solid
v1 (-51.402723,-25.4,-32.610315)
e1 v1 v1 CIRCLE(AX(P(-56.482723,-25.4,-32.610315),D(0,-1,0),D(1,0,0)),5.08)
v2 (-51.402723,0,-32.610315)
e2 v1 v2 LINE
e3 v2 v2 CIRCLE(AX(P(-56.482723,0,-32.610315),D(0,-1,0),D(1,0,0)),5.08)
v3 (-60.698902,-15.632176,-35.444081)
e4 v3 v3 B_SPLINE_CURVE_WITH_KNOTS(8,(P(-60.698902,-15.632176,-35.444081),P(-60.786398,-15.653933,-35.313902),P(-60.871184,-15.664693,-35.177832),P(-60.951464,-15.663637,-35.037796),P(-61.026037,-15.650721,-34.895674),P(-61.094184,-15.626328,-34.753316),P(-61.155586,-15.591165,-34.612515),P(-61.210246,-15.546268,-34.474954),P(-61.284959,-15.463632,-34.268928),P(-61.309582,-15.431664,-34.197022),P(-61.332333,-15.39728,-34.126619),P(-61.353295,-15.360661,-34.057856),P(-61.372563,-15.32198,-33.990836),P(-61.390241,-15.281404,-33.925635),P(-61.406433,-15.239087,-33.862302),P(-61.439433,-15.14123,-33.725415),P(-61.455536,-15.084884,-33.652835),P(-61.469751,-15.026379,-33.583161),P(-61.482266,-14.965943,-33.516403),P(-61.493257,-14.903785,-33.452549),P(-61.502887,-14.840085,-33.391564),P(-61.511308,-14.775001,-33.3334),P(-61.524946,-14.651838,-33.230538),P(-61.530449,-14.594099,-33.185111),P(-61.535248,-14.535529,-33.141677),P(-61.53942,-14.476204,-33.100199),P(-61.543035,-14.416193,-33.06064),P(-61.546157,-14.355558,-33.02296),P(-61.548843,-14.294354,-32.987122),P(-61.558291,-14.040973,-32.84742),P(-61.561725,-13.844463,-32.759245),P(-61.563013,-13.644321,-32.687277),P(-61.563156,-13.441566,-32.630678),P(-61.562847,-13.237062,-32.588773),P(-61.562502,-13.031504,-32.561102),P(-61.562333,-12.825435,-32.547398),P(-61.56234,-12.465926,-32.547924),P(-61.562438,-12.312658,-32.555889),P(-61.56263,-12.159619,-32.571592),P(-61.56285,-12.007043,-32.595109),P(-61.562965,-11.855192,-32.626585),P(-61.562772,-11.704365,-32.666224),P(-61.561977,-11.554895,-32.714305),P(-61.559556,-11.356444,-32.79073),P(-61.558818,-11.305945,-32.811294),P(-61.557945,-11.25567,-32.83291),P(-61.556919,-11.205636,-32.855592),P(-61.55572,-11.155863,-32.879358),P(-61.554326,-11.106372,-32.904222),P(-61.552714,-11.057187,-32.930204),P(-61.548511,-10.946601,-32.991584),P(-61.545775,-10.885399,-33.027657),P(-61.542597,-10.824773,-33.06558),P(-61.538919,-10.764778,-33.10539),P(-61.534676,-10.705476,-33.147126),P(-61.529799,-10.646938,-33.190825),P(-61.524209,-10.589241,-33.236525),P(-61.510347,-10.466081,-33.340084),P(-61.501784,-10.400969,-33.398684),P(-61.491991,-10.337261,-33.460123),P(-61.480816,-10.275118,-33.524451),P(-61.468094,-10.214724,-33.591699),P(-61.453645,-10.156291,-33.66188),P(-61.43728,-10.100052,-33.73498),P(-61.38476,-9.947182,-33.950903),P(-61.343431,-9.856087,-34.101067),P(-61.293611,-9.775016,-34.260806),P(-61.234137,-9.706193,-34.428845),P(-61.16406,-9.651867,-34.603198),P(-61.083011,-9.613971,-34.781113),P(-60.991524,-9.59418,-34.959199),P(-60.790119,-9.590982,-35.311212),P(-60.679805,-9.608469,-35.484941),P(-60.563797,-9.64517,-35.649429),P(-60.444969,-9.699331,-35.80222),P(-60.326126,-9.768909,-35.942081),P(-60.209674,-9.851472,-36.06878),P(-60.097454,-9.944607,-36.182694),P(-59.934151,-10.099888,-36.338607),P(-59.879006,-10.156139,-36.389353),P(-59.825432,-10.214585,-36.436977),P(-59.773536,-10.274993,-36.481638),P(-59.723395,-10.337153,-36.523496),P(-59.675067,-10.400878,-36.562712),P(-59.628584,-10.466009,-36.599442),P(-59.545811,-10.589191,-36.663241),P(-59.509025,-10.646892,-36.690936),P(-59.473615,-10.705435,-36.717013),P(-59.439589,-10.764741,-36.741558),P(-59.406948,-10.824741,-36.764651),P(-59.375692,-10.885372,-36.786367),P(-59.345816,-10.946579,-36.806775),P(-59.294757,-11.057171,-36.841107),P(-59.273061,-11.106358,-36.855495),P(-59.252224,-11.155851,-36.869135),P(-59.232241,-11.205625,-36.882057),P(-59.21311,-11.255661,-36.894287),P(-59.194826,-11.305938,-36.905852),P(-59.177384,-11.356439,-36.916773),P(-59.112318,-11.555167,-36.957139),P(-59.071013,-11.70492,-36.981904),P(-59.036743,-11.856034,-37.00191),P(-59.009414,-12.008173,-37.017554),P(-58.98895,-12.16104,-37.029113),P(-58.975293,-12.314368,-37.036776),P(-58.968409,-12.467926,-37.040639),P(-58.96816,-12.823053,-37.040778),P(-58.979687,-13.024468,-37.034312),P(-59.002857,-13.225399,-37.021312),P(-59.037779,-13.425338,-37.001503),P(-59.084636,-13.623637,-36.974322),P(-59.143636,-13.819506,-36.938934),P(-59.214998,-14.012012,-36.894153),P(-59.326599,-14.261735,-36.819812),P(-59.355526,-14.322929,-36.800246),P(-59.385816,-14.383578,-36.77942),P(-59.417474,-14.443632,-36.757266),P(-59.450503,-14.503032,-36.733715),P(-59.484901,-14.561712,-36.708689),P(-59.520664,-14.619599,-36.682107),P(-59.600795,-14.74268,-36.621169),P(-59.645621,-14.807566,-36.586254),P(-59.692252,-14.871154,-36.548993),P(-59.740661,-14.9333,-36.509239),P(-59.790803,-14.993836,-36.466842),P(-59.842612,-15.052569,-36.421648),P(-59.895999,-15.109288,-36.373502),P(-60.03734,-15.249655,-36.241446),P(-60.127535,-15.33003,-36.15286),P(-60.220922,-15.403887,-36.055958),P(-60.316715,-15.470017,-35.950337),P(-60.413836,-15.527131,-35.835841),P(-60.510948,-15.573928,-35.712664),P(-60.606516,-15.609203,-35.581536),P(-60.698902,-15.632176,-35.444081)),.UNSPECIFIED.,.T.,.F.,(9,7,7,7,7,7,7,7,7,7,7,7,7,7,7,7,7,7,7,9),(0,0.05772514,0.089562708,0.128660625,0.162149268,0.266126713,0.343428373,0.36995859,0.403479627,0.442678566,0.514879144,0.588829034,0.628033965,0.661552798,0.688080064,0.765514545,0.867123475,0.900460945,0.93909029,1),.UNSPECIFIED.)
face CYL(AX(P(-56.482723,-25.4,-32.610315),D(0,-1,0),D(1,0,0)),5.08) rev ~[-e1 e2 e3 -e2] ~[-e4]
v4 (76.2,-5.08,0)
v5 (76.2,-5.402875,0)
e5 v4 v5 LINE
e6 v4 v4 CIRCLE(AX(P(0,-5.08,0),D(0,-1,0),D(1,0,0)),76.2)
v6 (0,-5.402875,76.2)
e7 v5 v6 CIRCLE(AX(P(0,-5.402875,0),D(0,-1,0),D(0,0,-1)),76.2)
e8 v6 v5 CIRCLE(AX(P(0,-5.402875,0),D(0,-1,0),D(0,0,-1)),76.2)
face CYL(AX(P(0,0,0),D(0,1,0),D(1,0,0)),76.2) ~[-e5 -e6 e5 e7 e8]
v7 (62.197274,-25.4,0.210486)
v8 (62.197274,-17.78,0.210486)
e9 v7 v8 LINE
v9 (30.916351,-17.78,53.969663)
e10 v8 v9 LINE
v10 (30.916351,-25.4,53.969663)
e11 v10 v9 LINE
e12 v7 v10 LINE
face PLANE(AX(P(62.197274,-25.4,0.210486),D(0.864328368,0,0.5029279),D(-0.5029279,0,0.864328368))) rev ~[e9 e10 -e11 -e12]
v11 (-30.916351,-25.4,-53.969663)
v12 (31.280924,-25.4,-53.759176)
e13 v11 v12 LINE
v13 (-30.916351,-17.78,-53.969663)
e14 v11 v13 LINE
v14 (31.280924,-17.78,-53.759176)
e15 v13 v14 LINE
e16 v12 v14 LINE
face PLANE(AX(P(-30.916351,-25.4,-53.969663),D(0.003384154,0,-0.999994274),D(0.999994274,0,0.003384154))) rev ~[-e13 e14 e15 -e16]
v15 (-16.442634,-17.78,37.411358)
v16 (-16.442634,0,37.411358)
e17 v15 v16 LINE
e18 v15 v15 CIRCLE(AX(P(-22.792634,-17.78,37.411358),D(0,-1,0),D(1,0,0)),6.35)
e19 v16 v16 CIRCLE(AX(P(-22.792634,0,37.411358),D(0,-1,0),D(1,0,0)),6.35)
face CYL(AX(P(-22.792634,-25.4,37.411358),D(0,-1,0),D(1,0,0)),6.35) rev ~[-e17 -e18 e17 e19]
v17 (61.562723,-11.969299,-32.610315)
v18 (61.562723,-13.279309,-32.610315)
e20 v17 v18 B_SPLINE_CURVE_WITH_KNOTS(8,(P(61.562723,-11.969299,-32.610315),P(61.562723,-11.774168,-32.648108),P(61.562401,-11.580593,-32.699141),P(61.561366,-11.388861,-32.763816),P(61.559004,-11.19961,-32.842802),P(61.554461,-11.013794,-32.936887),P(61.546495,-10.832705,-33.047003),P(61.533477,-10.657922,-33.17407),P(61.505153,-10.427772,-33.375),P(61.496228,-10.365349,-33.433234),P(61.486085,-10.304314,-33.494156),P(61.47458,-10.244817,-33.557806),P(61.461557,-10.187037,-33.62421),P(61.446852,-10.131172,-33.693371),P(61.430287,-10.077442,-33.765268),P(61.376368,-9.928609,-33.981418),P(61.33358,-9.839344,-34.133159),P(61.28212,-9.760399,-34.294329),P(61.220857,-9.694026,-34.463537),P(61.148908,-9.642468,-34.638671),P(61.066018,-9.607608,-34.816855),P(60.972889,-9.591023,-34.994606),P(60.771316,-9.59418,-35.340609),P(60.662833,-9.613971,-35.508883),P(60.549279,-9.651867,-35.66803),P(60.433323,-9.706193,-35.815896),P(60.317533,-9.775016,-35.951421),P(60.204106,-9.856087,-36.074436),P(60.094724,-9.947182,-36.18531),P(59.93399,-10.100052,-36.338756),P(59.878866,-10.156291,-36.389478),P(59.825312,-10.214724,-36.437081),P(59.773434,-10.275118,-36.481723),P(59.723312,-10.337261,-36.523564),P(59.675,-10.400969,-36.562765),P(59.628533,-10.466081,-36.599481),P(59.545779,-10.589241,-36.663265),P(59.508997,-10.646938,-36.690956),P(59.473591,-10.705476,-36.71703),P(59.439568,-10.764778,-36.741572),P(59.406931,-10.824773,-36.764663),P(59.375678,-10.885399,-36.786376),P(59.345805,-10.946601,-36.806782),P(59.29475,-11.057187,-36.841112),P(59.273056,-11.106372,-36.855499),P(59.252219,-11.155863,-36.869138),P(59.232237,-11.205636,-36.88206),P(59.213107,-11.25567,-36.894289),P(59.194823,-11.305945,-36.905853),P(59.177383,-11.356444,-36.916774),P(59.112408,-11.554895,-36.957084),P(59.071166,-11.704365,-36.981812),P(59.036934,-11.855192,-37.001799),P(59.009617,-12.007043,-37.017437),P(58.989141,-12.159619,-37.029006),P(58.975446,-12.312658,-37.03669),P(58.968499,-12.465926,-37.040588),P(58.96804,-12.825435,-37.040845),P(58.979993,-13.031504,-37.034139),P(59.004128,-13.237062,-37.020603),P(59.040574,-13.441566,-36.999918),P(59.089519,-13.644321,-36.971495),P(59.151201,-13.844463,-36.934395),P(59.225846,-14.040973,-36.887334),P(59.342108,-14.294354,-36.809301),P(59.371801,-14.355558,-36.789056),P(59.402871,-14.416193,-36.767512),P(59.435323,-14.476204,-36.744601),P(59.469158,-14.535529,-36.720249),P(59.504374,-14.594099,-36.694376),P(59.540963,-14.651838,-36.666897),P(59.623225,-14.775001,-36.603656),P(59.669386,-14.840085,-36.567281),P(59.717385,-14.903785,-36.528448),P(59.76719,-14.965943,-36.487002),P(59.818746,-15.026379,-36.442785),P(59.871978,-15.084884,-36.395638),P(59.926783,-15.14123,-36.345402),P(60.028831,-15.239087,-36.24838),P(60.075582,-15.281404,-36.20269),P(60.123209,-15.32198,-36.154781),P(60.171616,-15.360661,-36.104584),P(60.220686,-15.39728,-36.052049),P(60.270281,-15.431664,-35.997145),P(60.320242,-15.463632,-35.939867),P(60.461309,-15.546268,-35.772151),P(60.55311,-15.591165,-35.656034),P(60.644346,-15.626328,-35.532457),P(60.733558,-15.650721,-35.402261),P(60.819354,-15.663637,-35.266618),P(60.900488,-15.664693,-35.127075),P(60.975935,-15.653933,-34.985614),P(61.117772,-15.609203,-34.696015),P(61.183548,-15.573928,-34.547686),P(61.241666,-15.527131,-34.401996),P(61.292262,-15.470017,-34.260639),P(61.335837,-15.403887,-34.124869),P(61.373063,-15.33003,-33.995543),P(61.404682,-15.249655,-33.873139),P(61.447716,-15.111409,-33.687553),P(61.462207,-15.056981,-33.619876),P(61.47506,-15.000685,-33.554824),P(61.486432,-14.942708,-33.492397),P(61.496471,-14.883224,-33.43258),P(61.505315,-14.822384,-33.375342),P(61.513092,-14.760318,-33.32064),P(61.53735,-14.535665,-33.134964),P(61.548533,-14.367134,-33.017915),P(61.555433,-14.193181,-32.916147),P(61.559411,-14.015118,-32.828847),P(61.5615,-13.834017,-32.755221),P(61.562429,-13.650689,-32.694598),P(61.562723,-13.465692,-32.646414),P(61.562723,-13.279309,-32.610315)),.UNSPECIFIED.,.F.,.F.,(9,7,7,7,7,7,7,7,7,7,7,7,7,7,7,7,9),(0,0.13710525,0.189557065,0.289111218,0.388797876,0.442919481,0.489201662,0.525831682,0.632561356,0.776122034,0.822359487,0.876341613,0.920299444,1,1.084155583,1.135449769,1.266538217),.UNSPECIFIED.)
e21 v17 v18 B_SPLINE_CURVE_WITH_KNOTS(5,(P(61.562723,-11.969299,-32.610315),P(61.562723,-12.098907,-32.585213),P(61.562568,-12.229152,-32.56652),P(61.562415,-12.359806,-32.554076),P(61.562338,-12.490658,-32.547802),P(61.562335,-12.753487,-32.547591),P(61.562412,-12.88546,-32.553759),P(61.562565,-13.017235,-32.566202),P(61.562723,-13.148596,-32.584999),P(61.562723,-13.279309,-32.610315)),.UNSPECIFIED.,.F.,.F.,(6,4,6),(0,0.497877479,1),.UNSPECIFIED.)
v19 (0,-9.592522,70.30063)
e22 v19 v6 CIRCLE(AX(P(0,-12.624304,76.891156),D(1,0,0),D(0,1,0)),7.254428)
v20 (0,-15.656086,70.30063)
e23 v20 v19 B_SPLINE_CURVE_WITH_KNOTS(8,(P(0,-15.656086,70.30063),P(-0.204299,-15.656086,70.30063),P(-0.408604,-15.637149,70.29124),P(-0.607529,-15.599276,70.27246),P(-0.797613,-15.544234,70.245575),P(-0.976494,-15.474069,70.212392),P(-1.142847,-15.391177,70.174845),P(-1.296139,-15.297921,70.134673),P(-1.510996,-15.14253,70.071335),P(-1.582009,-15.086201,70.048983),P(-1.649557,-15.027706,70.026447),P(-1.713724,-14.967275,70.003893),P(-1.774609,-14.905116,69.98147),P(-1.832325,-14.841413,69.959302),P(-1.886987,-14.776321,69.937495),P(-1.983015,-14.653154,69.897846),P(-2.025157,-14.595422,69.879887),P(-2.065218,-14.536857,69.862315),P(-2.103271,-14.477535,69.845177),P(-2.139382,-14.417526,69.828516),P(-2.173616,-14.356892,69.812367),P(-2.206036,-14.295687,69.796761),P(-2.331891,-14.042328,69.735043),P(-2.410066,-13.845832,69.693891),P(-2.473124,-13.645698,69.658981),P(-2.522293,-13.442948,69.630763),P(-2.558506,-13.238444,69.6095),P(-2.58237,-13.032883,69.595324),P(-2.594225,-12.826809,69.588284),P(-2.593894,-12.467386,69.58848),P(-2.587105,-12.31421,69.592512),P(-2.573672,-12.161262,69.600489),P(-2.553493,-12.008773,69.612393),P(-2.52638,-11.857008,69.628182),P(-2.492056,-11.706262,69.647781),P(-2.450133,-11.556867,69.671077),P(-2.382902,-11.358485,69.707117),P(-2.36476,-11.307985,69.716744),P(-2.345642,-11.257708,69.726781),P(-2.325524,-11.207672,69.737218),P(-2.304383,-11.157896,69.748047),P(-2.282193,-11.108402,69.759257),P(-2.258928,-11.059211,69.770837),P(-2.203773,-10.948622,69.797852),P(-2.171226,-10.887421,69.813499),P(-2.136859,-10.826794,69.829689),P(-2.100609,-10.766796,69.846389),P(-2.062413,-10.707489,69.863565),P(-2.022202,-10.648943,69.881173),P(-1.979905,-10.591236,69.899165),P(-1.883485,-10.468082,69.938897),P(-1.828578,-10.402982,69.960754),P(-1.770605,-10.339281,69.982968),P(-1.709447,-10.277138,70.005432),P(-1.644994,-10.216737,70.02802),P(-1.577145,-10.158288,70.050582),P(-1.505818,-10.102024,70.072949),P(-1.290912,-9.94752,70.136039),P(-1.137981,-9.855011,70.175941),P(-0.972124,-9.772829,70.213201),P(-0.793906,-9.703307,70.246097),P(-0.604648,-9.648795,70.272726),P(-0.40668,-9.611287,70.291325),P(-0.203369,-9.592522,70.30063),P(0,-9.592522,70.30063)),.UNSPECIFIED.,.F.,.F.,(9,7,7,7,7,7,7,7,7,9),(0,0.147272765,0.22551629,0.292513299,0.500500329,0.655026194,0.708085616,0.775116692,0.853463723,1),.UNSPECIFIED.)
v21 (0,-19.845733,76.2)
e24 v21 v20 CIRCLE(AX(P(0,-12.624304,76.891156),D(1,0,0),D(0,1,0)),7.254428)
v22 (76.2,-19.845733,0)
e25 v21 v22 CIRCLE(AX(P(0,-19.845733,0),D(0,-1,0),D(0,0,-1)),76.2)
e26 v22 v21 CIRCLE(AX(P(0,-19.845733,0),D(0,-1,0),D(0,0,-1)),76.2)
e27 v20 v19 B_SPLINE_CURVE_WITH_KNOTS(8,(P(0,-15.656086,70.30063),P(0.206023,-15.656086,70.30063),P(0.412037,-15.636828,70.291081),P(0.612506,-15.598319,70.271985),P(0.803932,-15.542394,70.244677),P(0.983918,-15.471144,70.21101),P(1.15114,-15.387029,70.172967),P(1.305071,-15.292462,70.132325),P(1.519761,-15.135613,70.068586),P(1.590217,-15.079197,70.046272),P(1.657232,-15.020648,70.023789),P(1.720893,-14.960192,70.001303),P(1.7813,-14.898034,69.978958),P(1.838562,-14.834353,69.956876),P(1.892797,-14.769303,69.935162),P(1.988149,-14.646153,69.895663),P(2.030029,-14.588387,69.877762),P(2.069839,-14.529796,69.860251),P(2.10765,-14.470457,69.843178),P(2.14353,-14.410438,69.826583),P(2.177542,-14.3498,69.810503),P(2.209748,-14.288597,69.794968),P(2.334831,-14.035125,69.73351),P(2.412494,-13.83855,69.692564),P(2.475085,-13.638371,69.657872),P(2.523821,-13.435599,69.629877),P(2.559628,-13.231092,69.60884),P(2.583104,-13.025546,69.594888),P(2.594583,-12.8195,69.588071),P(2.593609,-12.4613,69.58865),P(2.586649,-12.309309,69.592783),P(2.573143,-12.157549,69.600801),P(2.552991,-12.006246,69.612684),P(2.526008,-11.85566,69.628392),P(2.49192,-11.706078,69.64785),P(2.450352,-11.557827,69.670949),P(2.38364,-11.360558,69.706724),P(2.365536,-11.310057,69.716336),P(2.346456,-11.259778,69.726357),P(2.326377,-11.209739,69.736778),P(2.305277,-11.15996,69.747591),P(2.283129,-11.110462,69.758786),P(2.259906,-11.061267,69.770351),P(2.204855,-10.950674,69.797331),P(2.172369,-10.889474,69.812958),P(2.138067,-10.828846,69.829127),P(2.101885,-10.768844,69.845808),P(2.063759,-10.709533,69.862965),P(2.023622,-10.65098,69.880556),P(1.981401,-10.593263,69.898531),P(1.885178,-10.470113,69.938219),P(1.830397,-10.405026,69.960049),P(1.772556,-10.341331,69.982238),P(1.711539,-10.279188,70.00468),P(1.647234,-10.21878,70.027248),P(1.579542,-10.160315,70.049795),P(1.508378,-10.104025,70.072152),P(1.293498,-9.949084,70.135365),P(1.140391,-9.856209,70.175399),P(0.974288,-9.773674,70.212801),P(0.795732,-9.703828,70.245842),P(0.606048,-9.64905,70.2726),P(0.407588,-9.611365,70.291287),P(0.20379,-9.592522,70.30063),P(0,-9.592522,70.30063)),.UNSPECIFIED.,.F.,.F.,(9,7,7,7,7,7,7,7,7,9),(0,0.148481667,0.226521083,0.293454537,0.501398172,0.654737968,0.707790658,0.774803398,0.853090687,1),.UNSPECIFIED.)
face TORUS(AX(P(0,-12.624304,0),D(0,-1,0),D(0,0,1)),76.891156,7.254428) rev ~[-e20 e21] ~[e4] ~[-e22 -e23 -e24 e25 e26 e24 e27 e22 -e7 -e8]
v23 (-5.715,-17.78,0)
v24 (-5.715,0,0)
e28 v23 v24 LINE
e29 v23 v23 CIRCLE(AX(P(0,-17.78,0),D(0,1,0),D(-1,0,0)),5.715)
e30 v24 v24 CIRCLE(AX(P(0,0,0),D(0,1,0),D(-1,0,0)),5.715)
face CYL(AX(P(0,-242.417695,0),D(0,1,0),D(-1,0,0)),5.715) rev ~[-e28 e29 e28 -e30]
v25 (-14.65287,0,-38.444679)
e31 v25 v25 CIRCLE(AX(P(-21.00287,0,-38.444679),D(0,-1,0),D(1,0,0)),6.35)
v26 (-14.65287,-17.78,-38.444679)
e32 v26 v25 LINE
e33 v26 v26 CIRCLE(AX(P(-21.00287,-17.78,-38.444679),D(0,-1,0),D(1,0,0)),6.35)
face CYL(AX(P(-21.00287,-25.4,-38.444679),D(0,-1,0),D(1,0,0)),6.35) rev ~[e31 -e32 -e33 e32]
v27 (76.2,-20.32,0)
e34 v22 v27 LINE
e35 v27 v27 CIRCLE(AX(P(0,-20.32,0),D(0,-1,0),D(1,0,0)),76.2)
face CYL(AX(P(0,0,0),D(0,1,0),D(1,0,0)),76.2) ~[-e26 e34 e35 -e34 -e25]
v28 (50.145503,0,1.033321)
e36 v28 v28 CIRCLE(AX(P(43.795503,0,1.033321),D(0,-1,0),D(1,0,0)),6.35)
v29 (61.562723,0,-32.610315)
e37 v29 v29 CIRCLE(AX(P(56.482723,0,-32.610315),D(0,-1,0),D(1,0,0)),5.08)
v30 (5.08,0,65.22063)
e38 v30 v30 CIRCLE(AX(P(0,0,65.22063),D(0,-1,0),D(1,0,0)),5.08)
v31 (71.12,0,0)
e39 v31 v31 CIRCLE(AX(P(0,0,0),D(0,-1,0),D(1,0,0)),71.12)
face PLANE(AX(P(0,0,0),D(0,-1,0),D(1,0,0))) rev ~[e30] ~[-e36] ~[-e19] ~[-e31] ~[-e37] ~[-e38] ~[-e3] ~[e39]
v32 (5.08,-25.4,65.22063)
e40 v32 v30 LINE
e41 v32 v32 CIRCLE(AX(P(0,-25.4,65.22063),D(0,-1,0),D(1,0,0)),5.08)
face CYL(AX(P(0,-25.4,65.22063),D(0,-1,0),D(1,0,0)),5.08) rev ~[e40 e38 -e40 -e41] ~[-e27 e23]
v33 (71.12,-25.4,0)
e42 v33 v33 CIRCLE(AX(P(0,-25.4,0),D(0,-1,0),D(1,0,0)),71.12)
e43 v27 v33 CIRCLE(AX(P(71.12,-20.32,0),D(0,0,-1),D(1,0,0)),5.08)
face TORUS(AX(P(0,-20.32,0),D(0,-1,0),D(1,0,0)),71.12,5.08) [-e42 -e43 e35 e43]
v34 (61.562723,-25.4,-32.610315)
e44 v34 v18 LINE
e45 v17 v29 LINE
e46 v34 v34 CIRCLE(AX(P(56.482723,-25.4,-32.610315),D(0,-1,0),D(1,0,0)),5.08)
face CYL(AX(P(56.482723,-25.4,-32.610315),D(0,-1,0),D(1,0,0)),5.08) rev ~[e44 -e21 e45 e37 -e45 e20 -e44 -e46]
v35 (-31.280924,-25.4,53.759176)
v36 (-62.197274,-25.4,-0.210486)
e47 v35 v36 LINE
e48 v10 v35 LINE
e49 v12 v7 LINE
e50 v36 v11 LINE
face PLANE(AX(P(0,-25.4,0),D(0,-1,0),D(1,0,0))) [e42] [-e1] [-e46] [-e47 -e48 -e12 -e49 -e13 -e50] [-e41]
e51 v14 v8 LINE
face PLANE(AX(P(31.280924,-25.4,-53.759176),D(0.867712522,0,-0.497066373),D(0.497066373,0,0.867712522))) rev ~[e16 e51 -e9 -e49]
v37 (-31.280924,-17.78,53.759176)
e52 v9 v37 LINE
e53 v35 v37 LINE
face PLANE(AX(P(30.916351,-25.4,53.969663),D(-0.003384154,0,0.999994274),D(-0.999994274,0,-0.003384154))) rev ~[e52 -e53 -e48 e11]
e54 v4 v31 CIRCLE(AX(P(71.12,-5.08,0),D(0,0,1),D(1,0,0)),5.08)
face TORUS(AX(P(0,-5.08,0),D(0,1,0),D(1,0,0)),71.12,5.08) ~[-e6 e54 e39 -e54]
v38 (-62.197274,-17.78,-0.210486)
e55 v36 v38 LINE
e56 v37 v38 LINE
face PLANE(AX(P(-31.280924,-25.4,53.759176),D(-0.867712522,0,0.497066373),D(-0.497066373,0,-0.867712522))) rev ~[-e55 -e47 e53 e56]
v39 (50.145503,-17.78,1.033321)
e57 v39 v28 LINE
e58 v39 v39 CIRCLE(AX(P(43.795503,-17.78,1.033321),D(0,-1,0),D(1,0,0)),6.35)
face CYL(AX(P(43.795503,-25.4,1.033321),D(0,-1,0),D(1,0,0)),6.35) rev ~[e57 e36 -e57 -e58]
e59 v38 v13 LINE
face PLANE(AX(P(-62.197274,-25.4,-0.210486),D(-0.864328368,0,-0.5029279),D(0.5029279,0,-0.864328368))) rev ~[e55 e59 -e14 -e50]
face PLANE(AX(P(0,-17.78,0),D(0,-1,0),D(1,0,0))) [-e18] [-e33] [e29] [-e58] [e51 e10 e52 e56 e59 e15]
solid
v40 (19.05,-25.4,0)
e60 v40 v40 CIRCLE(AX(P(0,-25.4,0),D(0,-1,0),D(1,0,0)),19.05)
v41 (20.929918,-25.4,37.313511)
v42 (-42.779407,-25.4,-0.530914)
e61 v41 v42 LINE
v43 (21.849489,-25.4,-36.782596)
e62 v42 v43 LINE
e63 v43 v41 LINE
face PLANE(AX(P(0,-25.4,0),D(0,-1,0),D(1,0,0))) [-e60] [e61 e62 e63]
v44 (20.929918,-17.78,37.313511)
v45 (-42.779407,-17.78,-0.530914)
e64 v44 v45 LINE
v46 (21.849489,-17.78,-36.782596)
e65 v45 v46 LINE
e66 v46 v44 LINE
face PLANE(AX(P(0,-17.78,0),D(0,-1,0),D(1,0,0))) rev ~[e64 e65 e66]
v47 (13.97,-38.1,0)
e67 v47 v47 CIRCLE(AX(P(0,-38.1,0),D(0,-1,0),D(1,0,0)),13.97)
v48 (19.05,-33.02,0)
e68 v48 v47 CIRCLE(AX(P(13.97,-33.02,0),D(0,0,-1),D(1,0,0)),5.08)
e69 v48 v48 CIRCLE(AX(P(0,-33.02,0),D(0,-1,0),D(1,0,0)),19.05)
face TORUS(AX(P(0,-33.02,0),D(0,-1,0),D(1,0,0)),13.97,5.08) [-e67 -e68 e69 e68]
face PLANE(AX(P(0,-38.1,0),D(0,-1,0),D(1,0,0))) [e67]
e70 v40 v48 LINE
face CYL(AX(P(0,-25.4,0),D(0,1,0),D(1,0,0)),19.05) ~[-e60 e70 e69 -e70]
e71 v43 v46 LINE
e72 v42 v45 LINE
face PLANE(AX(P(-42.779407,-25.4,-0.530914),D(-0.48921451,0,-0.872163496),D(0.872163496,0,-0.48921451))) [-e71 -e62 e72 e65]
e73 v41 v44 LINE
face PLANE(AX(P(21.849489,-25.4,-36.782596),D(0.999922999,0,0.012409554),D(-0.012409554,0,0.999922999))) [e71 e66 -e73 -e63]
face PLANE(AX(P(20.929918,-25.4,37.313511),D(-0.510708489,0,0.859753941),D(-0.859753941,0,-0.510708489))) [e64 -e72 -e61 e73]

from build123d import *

# Parameters (mm, degrees)
F0_R      = 76.2
F1_DEPTH  = 25.4
F5_D      = 11.43
F6_R      = 19.05
F7_DEPTH  = 12.7
F8_R      = 5.08
F9_R      = 7.2544282258
F11_R     = 5.08
F13_DEPTH = 7.62
F15_DEPTH = 7.62
F16_R     = 6.35
F17_DEPTH = 25.4
F18_R     = 5.08
F19_DEPTH = 25.4


with BuildPart() as f1:
    # F0 (on Front) → F1 (new body)
    with BuildSketch(Plane.XZ):
        Circle(F0_R)
    extrude(amount=F1_DEPTH)

    # F5 (through all)
    with Locations(Plane.XZ.offset(25.4)):
        with Locations((0, 0)):
            Hole(F5_D / 2)

    # F8
    f8_edges = [f1.edges().sort_by_distance(p)[0] for p in [
        (76.2, -12.7, 0),
        (-76.2, 0, 0),
        (-76.2, -25.4, 0),
    ]]
    fillet(f8_edges, radius=F8_R)

    # F9 (on Right) → F10 (revolve, cut)
    with BuildSketch(Plane.YZ):
        with Locations((-12.624304023, 76.8911556739)):
            Circle(F9_R)
    revolve(axis=Axis((0, -25.4, 0), (0, -1, 0)), mode=Mode.SUBTRACT)

    # F12 (on face) → F13 (cut)
    with BuildSketch(Plane.XZ.offset(25.4)):
        Polygon((-30.9163505312, -53.9696626636), (31.2809236348, -53.7591762841), (62.1972741659, 0.2104863795), (30.9163505312, 53.9696626636), (-31.2809236348, 53.7591762841), (-62.1972741659, -0.2104863795), align=None)
    extrude(amount=-F13_DEPTH, mode=Mode.SUBTRACT)

    # F16 (on face) → F17 (cut)
    with BuildSketch(Plane.XZ.offset(25.4)):
        with Locations((-22.7926336229, 37.4113582075)):
            Circle(F16_R)
        with Locations((-21.0028697863, -38.4446788403)):
            Circle(F16_R)
        with Locations((43.7955034092, 1.0333206328)):
            Circle(F16_R)
    extrude(amount=-F17_DEPTH, mode=Mode.SUBTRACT)

    # F18 (on face) → F19 (cut)
    with BuildSketch(Plane.XZ.offset(25.4)):
        with Locations((0, 65.2206302532)):
            Circle(F18_R)
        with Locations((-56.4827226501, -32.6103151266)):
            Circle(F18_R)
        with Locations((56.4827226501, -32.6103151266)):
            Circle(F18_R)
    extrude(amount=-F19_DEPTH, mode=Mode.SUBTRACT)


with BuildPart() as f7:
    # F6 (on face) → F7 (new body)
    with BuildSketch(Plane.XZ.offset(25.4)):
        Circle(F6_R)
    extrude(amount=F7_DEPTH)

    # F11
    f11_edges = [f7.edges().sort_by_distance(p)[0] for p in [
        (-19.05, -38.1, 0),
    ]]
    fillet(f11_edges, radius=F11_R)

    # F14 (on face) → F15 (join)
    with BuildSketch(Plane.XZ.offset(25.4)):
        Polygon((-42.7794071983, -0.5309142646), (21.8494888395, -36.7825962603), (20.9299183588, 37.3135105249), align=None)
    extrude(amount=-F15_DEPTH)


solid = Compound([f1.part, f7.part])
